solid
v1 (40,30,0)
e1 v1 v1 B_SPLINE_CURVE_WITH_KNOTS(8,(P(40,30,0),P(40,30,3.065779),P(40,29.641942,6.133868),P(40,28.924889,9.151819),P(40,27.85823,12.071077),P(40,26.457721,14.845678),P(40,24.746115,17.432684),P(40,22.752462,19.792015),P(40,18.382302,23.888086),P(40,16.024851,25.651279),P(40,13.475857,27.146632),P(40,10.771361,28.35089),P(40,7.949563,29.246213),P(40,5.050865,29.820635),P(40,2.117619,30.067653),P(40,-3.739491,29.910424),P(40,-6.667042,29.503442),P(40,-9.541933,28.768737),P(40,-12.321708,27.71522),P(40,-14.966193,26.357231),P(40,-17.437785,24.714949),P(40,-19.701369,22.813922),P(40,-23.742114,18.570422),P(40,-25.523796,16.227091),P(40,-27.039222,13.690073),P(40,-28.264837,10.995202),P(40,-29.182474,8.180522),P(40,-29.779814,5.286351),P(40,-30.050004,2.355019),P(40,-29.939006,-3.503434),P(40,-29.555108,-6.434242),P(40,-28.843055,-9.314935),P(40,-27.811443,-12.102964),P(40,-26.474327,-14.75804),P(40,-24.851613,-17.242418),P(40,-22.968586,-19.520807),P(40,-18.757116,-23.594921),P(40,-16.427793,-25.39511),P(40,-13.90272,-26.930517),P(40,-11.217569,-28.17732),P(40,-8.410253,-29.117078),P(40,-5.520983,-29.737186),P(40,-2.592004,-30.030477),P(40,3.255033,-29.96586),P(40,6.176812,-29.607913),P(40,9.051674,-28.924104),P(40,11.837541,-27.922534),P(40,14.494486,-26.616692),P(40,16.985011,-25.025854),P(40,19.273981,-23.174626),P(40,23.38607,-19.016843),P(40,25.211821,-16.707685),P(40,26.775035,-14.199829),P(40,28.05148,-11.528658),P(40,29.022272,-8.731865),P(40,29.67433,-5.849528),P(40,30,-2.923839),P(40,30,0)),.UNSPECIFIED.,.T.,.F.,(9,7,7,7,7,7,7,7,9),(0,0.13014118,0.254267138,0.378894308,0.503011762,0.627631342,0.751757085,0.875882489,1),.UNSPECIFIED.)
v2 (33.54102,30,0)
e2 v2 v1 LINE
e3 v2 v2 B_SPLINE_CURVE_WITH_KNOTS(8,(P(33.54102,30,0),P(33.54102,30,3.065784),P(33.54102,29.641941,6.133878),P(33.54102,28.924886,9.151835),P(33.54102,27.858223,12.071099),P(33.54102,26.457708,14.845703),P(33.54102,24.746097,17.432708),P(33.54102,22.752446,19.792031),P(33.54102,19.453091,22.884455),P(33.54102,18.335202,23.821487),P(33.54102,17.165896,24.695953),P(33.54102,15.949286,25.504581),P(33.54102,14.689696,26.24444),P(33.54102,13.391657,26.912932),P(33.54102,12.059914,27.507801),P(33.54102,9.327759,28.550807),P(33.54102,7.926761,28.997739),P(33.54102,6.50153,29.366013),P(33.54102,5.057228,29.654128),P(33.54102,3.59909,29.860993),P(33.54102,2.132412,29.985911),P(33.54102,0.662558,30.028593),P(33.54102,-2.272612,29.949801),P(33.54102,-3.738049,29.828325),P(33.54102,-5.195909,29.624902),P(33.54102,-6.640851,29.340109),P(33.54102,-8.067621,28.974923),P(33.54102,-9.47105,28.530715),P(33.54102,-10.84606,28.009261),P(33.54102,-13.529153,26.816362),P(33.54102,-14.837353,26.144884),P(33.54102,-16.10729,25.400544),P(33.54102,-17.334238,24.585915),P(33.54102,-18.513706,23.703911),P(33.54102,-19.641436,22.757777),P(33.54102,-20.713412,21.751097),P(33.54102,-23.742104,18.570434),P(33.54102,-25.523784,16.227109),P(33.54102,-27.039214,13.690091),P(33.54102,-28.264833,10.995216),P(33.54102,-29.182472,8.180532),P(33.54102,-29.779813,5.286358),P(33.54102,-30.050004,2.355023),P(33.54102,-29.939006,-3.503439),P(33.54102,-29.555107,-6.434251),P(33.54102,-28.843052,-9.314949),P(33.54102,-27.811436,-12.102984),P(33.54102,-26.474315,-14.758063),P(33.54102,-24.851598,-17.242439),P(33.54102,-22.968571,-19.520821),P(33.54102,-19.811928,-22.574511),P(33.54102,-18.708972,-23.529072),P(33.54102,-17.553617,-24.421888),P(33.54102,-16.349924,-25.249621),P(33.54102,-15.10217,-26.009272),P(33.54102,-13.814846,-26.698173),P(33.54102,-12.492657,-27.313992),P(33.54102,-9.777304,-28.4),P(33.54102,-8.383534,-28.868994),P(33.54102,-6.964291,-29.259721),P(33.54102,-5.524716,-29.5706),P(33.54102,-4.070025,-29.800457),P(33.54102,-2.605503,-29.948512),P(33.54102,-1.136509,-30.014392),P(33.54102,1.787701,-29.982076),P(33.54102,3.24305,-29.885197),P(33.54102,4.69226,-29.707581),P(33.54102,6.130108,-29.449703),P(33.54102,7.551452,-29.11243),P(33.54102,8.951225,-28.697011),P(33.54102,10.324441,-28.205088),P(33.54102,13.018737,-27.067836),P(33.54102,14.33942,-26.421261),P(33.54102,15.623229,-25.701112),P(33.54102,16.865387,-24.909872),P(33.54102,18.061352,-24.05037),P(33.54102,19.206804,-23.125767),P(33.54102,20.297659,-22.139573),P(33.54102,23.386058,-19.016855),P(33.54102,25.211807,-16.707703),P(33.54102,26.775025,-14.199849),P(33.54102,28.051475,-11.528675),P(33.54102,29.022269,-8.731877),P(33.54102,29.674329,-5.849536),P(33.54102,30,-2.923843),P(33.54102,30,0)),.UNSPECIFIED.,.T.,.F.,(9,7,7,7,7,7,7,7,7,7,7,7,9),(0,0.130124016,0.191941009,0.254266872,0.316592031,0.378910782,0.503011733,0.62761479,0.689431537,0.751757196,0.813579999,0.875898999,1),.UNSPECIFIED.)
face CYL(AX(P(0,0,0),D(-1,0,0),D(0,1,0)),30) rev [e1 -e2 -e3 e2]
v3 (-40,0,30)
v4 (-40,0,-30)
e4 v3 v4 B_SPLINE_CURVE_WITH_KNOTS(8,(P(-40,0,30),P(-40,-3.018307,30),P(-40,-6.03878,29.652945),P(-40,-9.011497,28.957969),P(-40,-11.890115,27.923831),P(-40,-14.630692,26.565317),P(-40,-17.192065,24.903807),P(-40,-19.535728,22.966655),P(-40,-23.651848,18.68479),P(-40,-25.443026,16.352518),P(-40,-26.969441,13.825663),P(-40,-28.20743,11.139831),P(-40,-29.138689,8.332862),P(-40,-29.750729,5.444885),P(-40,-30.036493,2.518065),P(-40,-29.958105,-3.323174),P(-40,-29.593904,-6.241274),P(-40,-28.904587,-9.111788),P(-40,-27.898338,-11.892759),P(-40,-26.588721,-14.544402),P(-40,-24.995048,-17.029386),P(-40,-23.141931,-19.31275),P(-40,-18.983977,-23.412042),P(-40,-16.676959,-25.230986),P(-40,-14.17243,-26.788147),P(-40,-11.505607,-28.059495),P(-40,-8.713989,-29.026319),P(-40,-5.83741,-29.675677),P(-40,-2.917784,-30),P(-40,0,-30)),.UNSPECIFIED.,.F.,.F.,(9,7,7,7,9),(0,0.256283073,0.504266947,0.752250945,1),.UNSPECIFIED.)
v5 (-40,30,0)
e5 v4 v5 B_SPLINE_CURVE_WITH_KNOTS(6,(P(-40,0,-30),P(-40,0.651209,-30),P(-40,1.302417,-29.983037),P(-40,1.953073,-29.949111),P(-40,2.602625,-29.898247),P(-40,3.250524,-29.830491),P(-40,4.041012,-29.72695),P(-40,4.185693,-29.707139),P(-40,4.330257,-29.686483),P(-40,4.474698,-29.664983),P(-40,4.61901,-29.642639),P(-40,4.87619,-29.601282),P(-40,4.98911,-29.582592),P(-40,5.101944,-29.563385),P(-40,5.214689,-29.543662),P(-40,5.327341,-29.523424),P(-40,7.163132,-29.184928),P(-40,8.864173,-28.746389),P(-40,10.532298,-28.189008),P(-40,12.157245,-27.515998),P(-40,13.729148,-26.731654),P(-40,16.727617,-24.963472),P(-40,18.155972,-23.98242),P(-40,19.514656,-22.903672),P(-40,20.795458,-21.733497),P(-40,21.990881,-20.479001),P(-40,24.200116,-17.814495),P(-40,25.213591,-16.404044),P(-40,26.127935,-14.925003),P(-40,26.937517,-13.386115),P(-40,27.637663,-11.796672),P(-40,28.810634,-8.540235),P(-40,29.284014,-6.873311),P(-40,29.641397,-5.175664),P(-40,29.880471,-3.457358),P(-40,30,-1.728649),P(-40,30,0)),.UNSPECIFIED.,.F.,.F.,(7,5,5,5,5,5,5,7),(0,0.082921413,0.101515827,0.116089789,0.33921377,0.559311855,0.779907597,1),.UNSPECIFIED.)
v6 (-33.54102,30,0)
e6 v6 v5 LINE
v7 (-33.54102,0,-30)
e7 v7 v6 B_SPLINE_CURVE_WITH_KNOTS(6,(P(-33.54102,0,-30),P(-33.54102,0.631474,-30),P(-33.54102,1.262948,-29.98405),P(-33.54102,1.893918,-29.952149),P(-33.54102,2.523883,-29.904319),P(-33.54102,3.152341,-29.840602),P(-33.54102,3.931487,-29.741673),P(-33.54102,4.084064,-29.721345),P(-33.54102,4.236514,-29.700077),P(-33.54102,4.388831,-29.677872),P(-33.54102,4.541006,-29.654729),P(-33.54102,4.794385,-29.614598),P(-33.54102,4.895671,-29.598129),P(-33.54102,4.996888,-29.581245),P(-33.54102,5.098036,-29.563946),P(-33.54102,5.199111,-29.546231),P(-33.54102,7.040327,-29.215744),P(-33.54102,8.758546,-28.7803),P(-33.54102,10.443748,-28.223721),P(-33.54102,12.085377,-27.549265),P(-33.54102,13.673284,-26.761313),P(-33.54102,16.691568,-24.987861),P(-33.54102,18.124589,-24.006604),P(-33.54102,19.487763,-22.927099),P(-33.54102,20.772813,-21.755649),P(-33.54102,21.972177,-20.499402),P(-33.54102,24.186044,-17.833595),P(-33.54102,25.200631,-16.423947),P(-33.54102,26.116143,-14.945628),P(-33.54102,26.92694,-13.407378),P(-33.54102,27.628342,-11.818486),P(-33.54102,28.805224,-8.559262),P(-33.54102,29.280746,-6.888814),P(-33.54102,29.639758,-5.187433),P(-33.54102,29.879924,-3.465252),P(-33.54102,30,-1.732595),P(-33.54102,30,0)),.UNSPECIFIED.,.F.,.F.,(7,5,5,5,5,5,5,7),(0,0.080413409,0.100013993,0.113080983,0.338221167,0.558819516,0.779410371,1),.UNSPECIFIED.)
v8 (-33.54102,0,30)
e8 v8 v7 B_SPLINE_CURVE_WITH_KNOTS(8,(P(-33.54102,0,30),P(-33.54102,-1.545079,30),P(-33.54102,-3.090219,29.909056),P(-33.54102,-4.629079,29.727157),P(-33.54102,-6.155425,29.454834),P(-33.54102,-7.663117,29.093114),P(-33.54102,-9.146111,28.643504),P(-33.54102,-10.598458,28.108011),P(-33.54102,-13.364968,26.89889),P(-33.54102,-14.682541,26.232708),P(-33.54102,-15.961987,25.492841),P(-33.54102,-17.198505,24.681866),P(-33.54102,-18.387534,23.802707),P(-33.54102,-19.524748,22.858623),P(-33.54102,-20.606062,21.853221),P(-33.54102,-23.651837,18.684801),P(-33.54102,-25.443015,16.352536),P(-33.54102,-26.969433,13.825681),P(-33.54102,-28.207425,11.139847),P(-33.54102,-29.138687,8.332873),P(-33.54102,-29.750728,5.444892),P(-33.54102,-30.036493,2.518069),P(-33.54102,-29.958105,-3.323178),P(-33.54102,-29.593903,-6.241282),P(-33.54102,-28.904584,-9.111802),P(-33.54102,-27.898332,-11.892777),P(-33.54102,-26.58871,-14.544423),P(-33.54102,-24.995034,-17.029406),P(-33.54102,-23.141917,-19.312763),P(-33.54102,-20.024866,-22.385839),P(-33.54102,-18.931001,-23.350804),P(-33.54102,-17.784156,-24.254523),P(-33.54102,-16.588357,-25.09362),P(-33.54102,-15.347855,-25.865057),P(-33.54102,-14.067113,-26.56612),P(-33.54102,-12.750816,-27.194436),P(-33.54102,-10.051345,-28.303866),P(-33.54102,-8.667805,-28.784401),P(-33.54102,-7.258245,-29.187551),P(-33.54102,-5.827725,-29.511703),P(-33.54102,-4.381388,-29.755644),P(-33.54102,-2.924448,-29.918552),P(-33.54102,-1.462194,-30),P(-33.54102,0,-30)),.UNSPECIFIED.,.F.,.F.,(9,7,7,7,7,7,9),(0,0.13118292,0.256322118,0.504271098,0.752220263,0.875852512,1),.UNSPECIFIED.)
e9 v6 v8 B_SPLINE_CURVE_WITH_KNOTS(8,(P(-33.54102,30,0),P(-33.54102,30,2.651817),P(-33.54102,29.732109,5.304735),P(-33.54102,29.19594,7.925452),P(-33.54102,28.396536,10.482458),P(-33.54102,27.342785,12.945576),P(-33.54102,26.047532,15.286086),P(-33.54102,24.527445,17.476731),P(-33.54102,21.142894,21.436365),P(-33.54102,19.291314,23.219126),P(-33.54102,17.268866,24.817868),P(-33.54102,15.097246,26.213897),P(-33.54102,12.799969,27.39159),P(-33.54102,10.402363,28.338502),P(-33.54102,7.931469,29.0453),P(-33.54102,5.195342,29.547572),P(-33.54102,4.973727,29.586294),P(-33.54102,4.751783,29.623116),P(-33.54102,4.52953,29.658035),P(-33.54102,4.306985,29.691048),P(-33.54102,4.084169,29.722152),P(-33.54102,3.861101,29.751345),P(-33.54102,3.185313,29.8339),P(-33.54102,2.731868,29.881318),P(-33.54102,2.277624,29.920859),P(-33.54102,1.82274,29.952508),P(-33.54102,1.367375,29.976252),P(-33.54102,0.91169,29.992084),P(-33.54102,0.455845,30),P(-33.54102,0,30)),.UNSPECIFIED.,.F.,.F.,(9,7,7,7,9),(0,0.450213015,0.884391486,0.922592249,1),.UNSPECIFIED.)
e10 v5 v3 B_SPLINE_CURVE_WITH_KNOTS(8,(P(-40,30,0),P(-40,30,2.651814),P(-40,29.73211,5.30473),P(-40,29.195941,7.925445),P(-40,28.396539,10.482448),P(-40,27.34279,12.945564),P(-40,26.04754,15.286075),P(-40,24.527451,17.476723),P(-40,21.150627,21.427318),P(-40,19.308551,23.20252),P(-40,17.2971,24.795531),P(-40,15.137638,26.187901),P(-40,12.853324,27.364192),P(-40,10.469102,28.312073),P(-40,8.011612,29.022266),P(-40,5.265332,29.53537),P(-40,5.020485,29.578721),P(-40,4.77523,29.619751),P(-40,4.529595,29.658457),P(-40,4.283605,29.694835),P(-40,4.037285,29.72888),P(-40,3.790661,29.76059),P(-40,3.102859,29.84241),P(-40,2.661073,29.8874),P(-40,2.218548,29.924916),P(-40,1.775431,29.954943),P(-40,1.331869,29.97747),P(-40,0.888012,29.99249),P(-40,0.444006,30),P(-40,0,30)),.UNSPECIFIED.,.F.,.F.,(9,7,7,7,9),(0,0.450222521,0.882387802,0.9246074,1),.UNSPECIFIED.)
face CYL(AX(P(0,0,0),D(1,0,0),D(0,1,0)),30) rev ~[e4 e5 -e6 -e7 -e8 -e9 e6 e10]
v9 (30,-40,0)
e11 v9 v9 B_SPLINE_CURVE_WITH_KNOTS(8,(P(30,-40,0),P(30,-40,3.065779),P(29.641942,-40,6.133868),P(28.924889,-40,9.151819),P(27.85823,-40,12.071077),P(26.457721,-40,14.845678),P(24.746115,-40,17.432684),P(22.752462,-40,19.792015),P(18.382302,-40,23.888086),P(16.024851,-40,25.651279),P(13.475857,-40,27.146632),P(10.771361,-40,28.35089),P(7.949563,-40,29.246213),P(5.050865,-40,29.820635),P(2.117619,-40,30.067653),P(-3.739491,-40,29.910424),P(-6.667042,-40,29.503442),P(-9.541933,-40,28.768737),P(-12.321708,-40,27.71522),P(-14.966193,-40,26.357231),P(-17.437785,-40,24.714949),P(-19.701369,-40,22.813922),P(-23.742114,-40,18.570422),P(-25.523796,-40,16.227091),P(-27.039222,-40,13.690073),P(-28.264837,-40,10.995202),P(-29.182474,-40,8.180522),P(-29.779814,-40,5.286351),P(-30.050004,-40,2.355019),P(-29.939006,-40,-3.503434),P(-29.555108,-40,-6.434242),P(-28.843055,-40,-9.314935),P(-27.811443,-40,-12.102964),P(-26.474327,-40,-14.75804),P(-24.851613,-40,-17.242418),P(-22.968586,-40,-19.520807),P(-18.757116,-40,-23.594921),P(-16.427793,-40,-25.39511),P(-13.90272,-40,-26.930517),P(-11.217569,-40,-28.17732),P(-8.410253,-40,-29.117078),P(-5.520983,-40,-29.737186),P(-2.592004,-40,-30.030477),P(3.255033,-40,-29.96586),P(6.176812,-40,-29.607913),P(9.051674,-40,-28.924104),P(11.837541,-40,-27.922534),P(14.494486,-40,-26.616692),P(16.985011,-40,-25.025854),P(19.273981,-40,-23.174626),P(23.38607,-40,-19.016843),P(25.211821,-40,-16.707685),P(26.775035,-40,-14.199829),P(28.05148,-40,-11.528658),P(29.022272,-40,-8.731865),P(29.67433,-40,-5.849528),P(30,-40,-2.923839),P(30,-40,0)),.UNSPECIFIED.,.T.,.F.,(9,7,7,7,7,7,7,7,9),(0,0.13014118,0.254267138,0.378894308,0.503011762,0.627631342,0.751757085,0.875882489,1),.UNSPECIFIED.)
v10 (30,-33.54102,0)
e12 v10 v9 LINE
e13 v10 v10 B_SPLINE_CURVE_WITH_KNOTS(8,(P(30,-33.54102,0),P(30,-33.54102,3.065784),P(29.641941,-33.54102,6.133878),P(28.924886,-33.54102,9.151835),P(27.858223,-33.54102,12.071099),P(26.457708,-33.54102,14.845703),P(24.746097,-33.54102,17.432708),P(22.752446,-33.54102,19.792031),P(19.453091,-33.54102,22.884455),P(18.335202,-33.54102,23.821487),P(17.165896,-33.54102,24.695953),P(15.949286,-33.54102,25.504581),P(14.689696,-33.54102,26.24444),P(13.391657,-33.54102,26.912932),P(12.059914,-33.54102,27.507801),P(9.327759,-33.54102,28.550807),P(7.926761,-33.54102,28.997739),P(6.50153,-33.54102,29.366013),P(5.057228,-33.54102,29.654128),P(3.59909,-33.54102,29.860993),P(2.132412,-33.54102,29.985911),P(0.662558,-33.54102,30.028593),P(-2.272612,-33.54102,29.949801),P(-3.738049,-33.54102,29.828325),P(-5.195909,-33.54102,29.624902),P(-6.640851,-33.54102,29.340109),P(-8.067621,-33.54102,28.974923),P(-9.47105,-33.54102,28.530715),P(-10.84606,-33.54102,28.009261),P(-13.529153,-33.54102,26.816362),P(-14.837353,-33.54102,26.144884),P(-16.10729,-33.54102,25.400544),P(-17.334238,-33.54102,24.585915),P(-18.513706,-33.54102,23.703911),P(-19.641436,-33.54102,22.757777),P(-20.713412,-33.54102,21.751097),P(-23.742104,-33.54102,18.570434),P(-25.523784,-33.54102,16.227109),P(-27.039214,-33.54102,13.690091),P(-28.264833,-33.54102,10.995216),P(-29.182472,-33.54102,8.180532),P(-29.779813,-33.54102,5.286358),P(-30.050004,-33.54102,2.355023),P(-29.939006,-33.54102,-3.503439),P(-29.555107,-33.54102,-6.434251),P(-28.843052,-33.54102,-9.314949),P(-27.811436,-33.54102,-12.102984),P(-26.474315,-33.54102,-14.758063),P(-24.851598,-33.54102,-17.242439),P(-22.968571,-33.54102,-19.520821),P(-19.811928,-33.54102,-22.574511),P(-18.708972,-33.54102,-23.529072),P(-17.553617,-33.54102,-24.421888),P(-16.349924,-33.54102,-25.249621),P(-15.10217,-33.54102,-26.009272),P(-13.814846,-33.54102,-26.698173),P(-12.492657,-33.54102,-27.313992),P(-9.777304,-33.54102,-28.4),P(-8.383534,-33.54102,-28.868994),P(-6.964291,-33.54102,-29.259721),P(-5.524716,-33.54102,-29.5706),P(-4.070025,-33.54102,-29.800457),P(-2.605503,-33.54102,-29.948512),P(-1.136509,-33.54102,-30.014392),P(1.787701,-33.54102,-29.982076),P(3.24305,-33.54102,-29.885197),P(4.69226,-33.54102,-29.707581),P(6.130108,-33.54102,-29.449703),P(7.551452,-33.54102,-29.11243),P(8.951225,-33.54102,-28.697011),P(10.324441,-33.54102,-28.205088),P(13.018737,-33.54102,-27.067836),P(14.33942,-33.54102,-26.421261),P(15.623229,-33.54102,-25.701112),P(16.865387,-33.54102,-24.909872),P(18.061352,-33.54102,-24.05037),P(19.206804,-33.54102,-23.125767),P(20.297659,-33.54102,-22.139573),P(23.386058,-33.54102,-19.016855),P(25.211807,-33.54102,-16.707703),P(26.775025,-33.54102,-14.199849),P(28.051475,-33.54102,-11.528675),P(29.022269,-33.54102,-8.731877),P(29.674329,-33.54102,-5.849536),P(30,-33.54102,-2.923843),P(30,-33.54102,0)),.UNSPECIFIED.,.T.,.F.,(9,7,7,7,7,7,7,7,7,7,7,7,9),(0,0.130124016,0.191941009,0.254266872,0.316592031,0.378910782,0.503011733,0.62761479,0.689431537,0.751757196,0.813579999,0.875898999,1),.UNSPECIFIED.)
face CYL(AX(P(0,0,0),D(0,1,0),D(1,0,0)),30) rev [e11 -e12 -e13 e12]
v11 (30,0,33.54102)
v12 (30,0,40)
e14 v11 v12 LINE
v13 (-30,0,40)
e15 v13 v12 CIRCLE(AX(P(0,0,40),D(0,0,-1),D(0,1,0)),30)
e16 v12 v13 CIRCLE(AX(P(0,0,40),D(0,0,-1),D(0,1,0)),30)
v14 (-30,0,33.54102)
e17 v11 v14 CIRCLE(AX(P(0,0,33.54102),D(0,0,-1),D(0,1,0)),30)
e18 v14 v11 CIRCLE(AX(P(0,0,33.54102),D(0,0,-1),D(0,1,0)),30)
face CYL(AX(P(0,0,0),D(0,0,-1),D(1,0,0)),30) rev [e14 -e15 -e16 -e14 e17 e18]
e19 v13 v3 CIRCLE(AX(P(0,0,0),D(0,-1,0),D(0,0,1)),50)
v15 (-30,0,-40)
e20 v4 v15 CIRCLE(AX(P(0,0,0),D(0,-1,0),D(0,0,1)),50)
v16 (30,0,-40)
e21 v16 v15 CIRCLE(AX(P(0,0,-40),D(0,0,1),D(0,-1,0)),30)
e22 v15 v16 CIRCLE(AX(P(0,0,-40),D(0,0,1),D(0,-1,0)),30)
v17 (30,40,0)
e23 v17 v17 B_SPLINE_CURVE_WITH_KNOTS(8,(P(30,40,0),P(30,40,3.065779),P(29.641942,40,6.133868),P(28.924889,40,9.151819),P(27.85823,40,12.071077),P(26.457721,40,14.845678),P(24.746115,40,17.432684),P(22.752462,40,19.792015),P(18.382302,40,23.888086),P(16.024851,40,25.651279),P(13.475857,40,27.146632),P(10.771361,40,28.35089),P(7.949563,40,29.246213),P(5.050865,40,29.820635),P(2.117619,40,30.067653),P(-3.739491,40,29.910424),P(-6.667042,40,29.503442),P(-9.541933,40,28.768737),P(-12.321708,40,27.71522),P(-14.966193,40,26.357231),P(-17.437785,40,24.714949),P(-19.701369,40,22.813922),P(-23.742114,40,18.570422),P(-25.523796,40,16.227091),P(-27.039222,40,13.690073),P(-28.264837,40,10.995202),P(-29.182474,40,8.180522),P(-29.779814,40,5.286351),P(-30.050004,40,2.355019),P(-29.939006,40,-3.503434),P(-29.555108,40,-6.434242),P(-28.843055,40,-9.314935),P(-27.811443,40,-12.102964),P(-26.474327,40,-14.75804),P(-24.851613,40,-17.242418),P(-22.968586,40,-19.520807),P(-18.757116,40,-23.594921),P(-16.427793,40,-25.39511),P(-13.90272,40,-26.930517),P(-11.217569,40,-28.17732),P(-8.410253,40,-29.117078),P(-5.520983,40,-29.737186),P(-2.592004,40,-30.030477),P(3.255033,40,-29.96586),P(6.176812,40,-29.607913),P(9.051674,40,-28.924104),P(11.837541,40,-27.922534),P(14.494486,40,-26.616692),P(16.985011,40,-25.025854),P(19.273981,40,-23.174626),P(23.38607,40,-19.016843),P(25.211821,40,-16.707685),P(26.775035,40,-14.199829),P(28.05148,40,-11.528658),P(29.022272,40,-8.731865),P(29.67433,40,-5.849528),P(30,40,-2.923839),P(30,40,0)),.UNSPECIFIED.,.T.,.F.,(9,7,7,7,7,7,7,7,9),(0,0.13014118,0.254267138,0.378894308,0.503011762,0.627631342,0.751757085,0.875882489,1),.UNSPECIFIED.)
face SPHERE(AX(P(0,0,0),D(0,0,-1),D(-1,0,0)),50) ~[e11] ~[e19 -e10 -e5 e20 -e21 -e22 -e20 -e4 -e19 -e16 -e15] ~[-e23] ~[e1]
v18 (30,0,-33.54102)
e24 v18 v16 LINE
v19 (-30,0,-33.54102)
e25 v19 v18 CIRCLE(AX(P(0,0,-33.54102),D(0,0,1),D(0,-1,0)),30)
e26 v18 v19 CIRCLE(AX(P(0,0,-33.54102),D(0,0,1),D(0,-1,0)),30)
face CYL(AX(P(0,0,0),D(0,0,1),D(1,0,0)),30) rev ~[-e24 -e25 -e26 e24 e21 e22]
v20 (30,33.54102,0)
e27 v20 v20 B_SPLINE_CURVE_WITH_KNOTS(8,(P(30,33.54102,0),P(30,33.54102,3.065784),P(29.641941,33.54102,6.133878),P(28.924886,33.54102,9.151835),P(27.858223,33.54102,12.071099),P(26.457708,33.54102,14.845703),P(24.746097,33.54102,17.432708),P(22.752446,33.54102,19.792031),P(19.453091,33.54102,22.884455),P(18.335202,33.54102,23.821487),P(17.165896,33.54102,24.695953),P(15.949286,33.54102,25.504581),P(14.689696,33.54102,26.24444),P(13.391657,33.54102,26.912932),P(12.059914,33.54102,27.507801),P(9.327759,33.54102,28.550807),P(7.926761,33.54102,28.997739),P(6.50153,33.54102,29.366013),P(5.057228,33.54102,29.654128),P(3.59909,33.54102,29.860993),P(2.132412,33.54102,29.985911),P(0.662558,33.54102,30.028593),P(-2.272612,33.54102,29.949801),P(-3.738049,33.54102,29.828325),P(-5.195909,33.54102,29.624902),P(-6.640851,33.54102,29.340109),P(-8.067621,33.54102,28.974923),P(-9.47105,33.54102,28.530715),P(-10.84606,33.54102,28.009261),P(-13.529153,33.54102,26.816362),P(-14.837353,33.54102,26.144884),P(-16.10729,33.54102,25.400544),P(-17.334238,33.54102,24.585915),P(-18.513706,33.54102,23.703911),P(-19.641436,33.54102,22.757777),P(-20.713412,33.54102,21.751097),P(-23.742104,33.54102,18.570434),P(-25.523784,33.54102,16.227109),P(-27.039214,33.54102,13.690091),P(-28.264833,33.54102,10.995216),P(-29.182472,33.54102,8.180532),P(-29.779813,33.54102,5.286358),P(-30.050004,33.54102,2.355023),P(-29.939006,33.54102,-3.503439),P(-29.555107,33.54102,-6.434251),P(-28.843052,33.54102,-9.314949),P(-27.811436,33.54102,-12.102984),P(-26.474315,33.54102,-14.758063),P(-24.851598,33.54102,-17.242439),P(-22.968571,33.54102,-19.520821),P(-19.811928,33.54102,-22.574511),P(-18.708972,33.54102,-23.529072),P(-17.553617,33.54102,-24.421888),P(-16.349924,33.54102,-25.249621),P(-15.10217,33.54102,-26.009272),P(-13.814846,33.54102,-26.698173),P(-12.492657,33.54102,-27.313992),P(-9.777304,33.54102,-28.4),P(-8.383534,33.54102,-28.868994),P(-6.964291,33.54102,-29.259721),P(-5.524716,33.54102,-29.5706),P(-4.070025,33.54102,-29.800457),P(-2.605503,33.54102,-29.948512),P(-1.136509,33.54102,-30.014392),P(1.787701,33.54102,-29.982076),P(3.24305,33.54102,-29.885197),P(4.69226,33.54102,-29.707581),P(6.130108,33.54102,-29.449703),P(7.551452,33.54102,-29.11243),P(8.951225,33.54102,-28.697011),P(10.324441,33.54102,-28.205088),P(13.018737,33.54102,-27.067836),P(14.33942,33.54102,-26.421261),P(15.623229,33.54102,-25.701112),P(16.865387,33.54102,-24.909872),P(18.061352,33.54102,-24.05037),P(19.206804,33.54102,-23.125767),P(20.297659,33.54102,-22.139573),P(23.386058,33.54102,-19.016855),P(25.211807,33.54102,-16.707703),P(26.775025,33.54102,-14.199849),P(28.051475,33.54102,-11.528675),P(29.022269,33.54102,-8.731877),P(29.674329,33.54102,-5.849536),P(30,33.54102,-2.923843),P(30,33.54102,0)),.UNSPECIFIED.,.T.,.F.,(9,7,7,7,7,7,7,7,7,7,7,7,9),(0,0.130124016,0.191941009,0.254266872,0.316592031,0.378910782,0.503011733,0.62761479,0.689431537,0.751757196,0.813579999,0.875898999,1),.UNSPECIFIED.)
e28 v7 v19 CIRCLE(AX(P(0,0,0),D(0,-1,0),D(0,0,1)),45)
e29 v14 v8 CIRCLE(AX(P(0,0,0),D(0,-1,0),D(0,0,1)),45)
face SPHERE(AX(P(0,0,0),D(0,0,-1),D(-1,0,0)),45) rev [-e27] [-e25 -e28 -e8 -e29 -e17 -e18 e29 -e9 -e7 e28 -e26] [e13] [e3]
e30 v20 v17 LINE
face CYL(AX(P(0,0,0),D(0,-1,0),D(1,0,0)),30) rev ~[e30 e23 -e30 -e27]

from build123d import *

# Parameters (mm, degrees)
F2_R          = 30
F3_DEPTH      = 50.001
F3_DEPTH_BACK = 50.001
F4_R          = 30
F5_DEPTH      = 50.001
F5_DEPTH_BACK = 50.001
F6_R          = 30
F7_DEPTH      = 50.001
F7_DEPTH_BACK = 50.001


# Not quite as in the source:
# - a feature names something its author has since deleted; it is built from what else it names


with BuildPart() as f1:
    # F0 (on Front) → F1 (revolve)
    with BuildSketch(Plane.XZ):
        with BuildLine():
            Line((0, -50), (0, 0))
            Line((0, 0), (0, 50))
            ThreePointArc((0, 50), (-50, 0), (0, -50))
        make_face()
    revolve(axis=Axis((0, 0, 25), (0, 0, 1)))

    # F2 (on Front) → F3 (cut, two sides)
    with BuildSketch(Plane.XZ) as f3_sk:
        Circle(F2_R)
    extrude(amount=-F3_DEPTH, mode=Mode.SUBTRACT)
    extrude(f3_sk.sketch, amount=F3_DEPTH_BACK, mode=Mode.SUBTRACT)

    # F4 (on Right) → F5 (cut, two sides)
    with BuildSketch(Plane.YZ) as f5_sk:
        Circle(F4_R)
    extrude(amount=-F5_DEPTH, mode=Mode.SUBTRACT)
    extrude(f5_sk.sketch, amount=F5_DEPTH_BACK, mode=Mode.SUBTRACT)

    # F6 (on Top) → F7 (cut, two sides)
    with BuildSketch(Plane.XY) as f7_sk:
        Circle(F6_R)
    extrude(amount=F7_DEPTH, mode=Mode.SUBTRACT)
    extrude(f7_sk.sketch, amount=-F7_DEPTH_BACK, mode=Mode.SUBTRACT)

    # F8 (on Front) → F9 (revolve, cut)
    with BuildSketch(Plane.XZ):
        with BuildLine():
            Line((0, -45), (0, 0))
            Line((0, 0), (0, 45))
            ThreePointArc((0, 45), (-45, 0), (0, -45))
        make_face()
    revolve(axis=Axis((0, 0, 22.5), (0, 0, 1)), mode=Mode.SUBTRACT)


solid = f1.part
